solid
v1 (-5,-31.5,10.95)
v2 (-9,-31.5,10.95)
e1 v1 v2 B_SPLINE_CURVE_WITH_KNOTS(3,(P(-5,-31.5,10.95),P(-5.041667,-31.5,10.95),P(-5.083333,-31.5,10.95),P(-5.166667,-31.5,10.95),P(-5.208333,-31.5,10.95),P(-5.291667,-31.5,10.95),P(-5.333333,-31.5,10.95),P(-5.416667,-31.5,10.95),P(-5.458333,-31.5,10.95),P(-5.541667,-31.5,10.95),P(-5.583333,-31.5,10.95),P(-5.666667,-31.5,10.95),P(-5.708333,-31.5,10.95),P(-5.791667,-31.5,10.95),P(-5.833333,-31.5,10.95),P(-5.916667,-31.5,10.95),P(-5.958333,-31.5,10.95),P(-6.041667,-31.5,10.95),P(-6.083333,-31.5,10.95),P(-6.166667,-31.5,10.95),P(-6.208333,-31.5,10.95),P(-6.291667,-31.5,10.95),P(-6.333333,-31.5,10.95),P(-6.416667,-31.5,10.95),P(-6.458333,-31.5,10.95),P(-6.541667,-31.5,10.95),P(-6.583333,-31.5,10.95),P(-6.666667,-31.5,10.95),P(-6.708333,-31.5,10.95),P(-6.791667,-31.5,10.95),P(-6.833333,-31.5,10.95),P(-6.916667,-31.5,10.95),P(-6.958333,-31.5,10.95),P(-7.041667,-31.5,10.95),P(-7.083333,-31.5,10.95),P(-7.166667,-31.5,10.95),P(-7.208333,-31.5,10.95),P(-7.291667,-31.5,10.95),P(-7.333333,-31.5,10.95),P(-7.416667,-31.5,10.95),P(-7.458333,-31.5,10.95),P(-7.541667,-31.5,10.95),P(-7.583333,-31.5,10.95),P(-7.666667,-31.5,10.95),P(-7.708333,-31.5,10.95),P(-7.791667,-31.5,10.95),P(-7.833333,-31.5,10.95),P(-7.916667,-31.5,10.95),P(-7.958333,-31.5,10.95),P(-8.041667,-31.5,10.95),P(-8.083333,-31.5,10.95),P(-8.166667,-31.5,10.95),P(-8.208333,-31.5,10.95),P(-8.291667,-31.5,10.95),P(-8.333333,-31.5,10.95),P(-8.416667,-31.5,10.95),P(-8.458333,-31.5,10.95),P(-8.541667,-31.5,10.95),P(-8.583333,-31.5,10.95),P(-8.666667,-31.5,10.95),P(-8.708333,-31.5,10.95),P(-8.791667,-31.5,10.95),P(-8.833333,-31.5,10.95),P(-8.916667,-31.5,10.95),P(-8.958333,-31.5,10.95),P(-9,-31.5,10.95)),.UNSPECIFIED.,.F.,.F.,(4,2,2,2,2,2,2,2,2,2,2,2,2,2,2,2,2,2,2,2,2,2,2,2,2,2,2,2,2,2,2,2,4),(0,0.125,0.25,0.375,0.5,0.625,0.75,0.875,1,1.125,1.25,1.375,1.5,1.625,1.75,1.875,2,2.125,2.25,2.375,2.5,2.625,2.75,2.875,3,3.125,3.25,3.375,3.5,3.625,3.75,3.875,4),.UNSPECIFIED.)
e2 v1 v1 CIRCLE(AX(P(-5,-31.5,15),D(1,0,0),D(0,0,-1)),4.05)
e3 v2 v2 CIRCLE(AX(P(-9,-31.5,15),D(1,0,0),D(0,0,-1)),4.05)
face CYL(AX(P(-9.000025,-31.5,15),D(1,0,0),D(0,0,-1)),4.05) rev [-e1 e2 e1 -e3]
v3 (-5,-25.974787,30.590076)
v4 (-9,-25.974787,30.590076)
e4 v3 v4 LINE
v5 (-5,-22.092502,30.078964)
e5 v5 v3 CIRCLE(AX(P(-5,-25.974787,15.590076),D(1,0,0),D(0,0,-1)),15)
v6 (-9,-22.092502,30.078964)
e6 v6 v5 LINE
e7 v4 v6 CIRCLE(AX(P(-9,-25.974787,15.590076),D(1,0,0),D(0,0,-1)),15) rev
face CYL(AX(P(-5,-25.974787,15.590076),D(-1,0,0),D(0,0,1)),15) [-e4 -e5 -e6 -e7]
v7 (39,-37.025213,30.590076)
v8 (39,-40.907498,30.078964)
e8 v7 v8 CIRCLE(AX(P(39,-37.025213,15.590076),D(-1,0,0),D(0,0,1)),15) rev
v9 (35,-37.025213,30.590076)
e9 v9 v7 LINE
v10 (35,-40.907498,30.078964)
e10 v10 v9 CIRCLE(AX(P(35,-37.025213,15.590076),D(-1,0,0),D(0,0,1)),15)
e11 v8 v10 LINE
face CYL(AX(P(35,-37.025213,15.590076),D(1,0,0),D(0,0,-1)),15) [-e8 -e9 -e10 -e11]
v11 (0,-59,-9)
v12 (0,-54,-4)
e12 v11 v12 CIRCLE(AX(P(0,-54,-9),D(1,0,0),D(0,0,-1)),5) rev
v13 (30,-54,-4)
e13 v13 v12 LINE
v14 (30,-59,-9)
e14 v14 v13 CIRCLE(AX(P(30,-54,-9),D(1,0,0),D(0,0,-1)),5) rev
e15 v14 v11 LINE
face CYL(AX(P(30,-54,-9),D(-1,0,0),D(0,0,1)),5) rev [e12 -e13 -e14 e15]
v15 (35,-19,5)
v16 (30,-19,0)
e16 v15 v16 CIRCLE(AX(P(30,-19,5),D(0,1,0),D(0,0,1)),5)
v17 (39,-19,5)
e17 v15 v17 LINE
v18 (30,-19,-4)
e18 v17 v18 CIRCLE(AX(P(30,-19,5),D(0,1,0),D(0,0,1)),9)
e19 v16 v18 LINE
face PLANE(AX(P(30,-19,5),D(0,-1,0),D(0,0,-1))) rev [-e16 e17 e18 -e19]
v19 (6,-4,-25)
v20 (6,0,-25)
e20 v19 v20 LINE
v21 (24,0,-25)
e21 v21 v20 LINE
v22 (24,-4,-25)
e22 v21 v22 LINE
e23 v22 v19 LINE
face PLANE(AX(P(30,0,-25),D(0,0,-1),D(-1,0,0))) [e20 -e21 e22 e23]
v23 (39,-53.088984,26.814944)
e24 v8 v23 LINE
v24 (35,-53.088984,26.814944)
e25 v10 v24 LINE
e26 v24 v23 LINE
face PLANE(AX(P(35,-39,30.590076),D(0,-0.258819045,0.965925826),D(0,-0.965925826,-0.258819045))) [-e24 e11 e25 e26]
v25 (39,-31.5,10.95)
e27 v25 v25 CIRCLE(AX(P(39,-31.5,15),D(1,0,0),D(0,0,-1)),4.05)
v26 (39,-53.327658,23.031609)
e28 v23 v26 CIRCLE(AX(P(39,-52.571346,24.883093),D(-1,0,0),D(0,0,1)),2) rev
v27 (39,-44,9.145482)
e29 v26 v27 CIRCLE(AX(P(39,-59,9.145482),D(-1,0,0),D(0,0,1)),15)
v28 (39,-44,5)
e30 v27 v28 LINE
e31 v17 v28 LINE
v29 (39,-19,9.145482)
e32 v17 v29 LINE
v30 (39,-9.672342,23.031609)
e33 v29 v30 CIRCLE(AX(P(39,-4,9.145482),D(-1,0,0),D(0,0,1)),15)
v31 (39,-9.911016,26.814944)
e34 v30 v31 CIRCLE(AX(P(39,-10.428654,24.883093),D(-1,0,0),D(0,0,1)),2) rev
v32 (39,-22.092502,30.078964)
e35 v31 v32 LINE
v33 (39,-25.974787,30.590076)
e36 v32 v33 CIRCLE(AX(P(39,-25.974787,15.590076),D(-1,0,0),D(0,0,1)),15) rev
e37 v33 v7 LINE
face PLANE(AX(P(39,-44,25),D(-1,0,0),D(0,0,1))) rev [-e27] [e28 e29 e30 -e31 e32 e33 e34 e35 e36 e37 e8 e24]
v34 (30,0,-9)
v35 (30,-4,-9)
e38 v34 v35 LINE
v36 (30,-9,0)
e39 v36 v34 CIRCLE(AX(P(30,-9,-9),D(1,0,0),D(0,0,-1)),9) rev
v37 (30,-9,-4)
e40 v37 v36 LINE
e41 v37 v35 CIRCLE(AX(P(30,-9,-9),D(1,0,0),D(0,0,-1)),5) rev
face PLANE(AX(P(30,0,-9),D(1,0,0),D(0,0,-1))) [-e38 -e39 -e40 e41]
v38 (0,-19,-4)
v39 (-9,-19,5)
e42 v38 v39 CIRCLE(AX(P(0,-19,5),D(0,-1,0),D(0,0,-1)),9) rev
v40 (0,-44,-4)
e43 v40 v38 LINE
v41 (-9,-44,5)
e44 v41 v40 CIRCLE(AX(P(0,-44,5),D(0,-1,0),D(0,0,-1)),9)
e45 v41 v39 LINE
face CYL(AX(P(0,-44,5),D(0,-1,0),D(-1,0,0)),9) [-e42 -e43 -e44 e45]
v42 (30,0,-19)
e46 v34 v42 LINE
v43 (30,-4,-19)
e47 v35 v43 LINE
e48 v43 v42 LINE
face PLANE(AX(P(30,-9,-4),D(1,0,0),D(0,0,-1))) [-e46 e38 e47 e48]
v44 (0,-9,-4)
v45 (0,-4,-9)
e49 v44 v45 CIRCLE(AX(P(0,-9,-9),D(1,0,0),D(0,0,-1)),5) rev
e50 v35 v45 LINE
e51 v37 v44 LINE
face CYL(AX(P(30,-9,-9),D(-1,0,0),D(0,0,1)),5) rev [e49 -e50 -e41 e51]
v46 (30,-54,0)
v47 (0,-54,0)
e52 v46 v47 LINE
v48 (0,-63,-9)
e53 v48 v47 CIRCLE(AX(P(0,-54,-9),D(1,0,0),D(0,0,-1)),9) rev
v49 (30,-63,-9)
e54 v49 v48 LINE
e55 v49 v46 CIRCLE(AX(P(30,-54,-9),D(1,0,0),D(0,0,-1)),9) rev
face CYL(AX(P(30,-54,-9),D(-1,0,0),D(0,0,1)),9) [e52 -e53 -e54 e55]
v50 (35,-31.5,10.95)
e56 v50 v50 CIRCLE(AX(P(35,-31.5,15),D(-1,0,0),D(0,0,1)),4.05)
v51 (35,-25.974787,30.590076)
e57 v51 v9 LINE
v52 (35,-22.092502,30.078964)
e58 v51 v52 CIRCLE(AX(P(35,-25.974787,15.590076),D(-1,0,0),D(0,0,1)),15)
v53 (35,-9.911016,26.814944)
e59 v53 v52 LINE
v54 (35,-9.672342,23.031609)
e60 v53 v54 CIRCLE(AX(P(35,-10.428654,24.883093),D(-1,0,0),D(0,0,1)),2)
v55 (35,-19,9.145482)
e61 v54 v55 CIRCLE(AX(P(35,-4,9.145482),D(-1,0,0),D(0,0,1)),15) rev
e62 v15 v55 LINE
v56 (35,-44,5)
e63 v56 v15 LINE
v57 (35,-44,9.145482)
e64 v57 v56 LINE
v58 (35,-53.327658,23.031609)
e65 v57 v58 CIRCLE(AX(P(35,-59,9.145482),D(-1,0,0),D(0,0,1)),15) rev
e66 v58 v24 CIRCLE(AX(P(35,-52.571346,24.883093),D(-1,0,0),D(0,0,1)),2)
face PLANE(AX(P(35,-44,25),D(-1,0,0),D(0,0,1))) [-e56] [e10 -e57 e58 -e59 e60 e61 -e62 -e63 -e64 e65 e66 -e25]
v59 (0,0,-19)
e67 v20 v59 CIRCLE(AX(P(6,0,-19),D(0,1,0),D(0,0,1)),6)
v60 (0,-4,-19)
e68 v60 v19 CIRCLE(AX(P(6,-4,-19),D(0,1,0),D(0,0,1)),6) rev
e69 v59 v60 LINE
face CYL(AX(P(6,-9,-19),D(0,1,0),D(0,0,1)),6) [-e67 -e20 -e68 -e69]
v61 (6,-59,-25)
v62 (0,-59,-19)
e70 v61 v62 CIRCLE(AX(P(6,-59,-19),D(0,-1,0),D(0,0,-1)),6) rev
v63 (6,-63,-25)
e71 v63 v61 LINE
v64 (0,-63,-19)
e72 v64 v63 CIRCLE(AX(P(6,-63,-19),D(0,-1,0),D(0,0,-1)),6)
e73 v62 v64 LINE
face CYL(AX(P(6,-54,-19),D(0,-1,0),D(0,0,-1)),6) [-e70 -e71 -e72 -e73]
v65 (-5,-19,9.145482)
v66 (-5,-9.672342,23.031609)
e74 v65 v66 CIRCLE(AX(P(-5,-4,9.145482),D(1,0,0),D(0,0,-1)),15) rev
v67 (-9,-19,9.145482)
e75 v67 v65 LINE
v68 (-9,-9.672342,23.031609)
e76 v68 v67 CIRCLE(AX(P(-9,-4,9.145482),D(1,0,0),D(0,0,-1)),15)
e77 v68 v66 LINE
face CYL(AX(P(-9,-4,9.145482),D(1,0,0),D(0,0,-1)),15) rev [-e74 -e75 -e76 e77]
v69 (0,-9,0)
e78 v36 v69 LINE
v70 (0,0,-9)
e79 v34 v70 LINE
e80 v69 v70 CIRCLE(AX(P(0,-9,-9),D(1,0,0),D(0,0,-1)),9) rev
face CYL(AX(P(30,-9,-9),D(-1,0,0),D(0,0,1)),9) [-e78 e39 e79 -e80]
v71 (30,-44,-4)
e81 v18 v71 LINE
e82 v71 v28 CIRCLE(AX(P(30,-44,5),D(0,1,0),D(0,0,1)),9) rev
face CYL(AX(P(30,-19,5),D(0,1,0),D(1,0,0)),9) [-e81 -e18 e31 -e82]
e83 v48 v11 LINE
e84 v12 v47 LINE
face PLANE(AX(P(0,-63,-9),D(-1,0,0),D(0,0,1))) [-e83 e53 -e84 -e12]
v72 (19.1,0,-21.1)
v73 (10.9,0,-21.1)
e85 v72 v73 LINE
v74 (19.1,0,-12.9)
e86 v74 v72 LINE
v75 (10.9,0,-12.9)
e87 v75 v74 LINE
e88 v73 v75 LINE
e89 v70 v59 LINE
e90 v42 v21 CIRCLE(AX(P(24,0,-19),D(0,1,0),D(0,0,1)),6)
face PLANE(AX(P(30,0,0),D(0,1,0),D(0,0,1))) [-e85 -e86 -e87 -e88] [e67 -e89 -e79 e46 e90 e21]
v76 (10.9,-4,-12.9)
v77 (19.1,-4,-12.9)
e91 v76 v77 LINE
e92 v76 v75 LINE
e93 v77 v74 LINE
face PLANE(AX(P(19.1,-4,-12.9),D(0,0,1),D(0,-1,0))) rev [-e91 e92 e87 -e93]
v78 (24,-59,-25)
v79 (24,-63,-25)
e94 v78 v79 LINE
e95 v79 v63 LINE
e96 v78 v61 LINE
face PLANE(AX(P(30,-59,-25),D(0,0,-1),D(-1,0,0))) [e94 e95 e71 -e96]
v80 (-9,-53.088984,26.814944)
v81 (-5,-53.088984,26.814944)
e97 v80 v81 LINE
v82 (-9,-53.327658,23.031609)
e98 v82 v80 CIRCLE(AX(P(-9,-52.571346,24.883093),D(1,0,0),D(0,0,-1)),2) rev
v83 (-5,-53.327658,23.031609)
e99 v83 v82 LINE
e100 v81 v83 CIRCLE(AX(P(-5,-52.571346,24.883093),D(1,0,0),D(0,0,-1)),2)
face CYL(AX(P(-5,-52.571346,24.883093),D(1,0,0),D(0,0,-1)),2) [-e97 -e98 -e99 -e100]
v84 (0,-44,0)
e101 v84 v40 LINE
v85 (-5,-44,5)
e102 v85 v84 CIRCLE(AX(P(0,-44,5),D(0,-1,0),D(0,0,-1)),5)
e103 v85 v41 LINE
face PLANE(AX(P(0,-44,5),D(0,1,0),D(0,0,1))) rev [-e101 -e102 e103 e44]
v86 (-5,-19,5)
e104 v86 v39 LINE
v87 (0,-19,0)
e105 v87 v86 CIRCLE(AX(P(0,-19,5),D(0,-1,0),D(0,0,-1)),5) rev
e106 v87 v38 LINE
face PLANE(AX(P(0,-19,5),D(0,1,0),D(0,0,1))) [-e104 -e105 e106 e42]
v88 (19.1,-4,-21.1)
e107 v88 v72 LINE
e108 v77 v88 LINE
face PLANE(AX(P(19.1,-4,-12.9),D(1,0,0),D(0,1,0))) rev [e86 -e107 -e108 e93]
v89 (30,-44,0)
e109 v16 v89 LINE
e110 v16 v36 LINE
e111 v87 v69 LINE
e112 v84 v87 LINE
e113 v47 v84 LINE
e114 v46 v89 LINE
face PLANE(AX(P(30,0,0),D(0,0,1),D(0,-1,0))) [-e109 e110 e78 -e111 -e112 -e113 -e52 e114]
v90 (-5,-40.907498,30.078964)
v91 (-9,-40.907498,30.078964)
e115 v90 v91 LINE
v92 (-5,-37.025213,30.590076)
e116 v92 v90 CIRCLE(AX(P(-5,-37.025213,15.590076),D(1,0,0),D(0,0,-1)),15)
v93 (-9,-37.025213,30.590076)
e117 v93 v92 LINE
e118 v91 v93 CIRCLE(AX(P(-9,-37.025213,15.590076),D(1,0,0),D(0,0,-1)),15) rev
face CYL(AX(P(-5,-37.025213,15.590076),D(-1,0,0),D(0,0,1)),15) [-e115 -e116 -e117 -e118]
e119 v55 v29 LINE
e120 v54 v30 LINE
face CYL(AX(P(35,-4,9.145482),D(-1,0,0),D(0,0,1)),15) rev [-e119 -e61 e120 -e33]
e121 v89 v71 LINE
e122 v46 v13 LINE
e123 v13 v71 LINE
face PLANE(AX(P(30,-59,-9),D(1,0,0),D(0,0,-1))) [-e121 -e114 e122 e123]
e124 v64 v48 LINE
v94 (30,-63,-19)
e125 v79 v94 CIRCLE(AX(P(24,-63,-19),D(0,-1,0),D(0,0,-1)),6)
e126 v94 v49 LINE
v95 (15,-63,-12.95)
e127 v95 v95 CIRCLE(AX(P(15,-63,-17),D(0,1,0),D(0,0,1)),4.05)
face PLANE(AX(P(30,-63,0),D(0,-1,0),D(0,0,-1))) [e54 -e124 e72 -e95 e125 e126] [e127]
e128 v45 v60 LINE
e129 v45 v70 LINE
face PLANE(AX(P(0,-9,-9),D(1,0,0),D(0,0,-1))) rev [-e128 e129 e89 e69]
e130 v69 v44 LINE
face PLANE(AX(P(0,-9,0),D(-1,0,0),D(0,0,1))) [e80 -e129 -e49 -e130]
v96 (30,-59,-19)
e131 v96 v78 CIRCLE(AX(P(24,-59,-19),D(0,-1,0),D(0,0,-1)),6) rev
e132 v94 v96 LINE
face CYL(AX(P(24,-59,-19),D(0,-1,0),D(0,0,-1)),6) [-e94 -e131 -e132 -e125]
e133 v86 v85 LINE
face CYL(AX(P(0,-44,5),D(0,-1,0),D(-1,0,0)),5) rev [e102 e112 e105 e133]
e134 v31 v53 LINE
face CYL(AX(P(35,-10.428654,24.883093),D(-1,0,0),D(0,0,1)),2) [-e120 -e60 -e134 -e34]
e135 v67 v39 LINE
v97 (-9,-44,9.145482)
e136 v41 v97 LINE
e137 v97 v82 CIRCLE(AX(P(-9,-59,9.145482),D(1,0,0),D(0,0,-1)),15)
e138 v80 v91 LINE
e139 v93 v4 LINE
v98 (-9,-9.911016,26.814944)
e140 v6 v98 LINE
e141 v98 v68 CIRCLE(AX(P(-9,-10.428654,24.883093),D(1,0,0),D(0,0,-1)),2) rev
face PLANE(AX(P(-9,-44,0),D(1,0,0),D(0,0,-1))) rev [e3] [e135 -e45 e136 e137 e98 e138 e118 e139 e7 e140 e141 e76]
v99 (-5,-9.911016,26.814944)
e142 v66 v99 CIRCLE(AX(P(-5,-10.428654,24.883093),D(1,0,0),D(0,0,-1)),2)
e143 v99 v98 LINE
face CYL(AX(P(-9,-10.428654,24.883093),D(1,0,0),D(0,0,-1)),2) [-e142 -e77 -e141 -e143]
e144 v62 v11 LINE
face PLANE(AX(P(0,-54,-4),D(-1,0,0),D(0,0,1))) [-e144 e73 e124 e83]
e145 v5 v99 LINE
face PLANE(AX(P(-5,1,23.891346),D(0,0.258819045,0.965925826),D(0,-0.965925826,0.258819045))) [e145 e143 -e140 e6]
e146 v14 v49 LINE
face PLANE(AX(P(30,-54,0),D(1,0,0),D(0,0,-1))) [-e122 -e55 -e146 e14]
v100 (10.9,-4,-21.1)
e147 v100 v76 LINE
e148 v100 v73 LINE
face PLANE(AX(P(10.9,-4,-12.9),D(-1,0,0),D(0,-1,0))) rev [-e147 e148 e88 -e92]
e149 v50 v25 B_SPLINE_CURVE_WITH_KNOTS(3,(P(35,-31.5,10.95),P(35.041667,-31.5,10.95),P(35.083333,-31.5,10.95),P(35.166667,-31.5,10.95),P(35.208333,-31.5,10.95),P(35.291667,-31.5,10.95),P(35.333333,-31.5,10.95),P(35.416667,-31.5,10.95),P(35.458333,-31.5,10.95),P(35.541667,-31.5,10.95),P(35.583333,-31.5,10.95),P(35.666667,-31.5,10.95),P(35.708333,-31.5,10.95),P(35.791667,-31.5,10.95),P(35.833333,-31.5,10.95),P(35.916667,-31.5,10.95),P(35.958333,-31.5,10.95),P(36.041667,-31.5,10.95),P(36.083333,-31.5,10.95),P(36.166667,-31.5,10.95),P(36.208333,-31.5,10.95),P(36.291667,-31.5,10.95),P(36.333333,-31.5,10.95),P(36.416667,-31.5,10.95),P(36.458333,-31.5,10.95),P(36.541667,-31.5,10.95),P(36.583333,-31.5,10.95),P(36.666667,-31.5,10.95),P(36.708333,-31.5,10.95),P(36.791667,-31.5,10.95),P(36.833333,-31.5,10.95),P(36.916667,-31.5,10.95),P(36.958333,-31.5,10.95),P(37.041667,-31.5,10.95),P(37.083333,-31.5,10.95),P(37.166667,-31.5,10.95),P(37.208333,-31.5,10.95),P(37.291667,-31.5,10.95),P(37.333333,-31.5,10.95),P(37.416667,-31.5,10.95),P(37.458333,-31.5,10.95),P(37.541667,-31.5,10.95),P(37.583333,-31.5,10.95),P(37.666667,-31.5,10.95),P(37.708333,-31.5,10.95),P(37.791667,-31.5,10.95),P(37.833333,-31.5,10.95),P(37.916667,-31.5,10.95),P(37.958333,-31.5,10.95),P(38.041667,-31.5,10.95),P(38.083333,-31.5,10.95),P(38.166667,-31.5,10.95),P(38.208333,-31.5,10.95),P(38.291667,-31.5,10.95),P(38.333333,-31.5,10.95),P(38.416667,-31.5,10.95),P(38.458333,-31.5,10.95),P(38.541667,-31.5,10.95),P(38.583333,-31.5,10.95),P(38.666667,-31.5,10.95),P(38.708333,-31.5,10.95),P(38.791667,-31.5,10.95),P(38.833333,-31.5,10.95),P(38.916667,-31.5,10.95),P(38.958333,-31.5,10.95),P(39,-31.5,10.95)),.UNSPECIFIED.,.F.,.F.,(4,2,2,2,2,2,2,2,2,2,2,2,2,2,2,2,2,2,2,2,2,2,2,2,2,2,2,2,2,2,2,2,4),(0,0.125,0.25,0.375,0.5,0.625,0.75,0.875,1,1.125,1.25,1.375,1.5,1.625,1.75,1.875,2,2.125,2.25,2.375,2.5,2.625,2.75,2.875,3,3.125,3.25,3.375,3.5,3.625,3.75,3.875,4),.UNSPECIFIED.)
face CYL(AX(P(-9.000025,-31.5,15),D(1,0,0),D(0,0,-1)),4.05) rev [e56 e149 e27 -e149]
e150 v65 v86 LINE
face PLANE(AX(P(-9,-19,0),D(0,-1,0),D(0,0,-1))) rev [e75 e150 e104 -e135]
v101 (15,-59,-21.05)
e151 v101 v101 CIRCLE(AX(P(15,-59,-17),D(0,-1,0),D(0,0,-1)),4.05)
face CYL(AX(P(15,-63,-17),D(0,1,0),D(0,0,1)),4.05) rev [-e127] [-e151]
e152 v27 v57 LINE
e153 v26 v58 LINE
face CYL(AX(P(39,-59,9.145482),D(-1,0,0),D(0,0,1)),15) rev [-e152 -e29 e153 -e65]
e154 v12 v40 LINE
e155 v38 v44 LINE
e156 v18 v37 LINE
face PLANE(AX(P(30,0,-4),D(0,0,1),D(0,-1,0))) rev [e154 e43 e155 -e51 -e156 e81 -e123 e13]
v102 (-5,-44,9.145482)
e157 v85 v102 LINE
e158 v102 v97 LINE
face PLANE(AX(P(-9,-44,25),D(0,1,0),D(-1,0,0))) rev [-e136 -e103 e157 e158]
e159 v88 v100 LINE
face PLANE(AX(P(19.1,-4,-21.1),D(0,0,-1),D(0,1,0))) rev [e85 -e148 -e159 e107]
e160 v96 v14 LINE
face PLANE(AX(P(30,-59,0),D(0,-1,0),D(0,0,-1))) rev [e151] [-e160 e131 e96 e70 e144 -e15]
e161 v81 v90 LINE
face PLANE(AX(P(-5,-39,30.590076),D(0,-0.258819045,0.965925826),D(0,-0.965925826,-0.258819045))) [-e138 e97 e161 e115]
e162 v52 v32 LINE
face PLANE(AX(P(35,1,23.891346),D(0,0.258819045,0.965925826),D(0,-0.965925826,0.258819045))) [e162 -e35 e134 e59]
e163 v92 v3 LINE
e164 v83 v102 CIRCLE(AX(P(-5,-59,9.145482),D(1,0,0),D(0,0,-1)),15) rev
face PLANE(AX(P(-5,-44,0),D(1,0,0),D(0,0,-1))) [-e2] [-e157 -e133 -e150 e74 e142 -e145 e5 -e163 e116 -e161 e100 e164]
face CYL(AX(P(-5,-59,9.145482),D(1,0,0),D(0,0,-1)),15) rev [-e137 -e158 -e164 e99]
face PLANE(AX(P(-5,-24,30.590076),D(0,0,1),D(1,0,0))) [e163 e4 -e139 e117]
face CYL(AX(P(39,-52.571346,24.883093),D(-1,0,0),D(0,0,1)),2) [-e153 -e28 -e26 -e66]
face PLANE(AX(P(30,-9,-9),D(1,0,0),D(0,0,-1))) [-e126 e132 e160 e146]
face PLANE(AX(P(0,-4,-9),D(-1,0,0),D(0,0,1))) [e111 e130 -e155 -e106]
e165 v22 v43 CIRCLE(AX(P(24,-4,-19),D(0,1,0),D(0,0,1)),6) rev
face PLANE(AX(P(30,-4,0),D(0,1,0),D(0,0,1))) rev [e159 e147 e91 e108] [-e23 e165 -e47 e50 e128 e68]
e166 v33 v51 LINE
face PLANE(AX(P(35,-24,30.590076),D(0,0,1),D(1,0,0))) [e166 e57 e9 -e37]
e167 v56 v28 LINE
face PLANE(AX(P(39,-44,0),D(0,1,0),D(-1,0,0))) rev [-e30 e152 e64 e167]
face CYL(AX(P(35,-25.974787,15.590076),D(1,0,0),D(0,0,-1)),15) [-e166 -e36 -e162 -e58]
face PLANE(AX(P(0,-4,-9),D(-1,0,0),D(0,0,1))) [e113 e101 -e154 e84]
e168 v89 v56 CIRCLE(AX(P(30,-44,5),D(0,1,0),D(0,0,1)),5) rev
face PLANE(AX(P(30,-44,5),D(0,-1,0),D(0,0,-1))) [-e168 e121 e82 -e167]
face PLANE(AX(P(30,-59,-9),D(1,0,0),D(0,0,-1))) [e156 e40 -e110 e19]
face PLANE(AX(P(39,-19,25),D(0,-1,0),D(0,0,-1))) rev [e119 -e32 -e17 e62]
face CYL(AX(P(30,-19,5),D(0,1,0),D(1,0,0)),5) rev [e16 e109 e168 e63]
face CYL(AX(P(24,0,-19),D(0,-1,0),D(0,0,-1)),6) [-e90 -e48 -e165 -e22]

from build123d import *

# Parameters (mm, degrees)
SM_BASE_FLANGE_1_DEPTH      = 30
SM_EDGE_FLANGE_1_DEPTH      = 25
SM_EDGE_FLANGE_1_BEND_DEPTH = 25
SKETCH_10_R                 = 4.05
CUT_EXTRUDE_1_DEPTH         = 79.198465458
SKETCH_11_R                 = 4.05
CUT_EXTRUDE_2_DEPTH         = 84.054199171
FILLET_1_R                  = 6
SKETCH_12_W                 = 8.2
SKETCH_12_H                 = 8.2
CUT_EXTRUDE_3_DEPTH         = 4
SM_BASE_FLANGE_1_2_DEPTH    = 4
SM_BASE_FLANGE_2_DEPTH      = 4
FILLET_2_R                  = 15
FILLET_3_R                  = 2


# Sheet-metal steps are written as plain solids
with BuildPart() as part:
    # Sketch 1 → Sm Base Flange 1 (new body)
    with BuildSketch(Plane(origin=(0, 0, 0), x_dir=(0, 0, -1), z_dir=(1, 0, 0))):
        with BuildLine():
            Line((25, -63), (9, -63))
            ThreePointArc((9, -63), (2.636038969, -60.363961031), (0, -54))
            Line((0, -54), (0, -9))
            ThreePointArc((0, -9), (2.636038969, -2.636038969), (9, 0))
            Line((9, 0), (25, 0))
            Line((25, 0), (25, -4))
            Line((25, -4), (9, -4))
            ThreePointArc((9, -4), (5.464466094, -5.464466094), (4, -9))
            Line((4, -9), (4, -54))
            ThreePointArc((4, -54), (5.464466094, -57.535533906), (9, -59))
            Line((9, -59), (25, -59))
            Line((25, -59), (25, -63))
        make_face()
    extrude(amount=SM_BASE_FLANGE_1_DEPTH)

    # Ребро-кромка1 section (across the edge) → Ребро-кромка1 (add)
    with BuildSketch(Plane(origin=(-5, -19, 0), x_dir=(1, 0, 0), z_dir=(0, -1, 0))):
        with BuildLine():
            Line((-4, 5), (-4, 25))
            Line((-4, 25), (0, 25))
            Line((0, 25), (0, 5))
            ThreePointArc((0, 5), (1.464466094, 1.464466094), (5, 0))
            Line((5, 0), (5, -4))
            ThreePointArc((5, -4), (-1.363961031, -1.363961031), (-4, 5))
        make_face()
    extrude(amount=SM_EDGE_FLANGE_1_DEPTH)

    # Ребро-кромка1 section 2 (across the edge) → Ребро-кромка1 bend (add)
    with BuildSketch(Plane(origin=(35, -44, 0), x_dir=(-1, 0, 0), z_dir=(0, 1, 0))):
        with BuildLine():
            Line((-4, 5), (-4, 25))
            Line((-4, 25), (0, 25))
            Line((0, 25), (0, 5))
            ThreePointArc((0, 5), (1.464466094, 1.464466094), (5, 0))
            Line((5, 0), (5, -4))
            ThreePointArc((5, -4), (-1.363961031, -1.363961031), (-4, 5))
        make_face()
    extrude(amount=SM_EDGE_FLANGE_1_BEND_DEPTH)

    # Эскиз10 → Вырез-Вытянуть1 (cut, through all)
    with BuildSketch(Plane(origin=(0, 0, 0), x_dir=(1, 0, 0), z_dir=(0, 1, 0))):
        with Locations(Location((15, 17, 0), (0, 0, 270))):
            Circle(SKETCH_10_R)
    extrude(amount=-CUT_EXTRUDE_1_DEPTH, mode=Mode.SUBTRACT)

    # Эскиз11 → Вырез-Вытянуть2 (cut, through all)
    with BuildSketch(Plane(origin=(39, 0, 0), x_dir=(0, 0, -1), z_dir=(1, 0, 0))):
        with Locations((-15, -31.5)):
            Circle(SKETCH_11_R)
    extrude(amount=-CUT_EXTRUDE_2_DEPTH, mode=Mode.SUBTRACT)

    # Скругление1
    fillet_1_edges = [part.edges().sort_by_distance(p)[0] for p in [
        (0, -61, -25),
        (0, -2, -25),
        (30, -61, -25),
        (30, -2, -25),
    ]]
    fillet(fillet_1_edges, radius=FILLET_1_R)

    # Эскиз12 → Вырез-Вытянуть3 (cut)
    with BuildSketch(Plane(origin=(0, 0, 0), x_dir=(1, 0, 0), z_dir=(0, 1, 0))):
        with Locations((15, 17)):
            Rectangle(SKETCH_12_W, SKETCH_12_H)
    extrude(amount=-CUT_EXTRUDE_3_DEPTH, mode=Mode.SUBTRACT)

    # Эскиз13 → Sm Base Flange 1 2 (add)
    with BuildSketch(Plane(origin=(39, 0, 0), x_dir=(0, 0, -1), z_dir=(1, 0, 0))):
        Polygon((-25, -19), (-23.891346313, 1), (-30.590076124, -24), (-30.590076124, -39), (-23.891346313, -64), (-25, -44), align=None)
    extrude(amount=-SM_BASE_FLANGE_1_2_DEPTH)

    # Эскиз14 → Выступ2 (add)
    with BuildSketch(Plane.ZY.offset(9)):
        Polygon((25, -19), (23.891346313, 1), (30.590076124, -24), (30.590076124, -39), (23.891346313, -64), (25, -44), align=None)
    extrude(amount=-SM_BASE_FLANGE_2_DEPTH)

    # Скругление2
    fillet_2_edges = [part.edges().sort_by_distance(p)[0] for p in [
        (37, -39, 30.590076124),
        (37, -24, 30.590076124),
        (-7, -24, 30.590076124),
        (-7, -39, 30.590076124),
        (-7, -19, 25),
        (-7, -44, 25),
        (37, -44, 25),
        (37, -19, 25),
    ]]
    fillet(fillet_2_edges, radius=FILLET_2_R)

    # Скругление3
    fillet_3_edges = [part.edges().sort_by_distance(p)[0] for p in [
        (-7, -64, 23.891346313),
        (37, -64, 23.891346313),
        (37, 1, 23.891346313),
        (-7, 1, 23.891346313),
    ]]
    fillet(fillet_3_edges, radius=FILLET_3_R)


solid = part.part
